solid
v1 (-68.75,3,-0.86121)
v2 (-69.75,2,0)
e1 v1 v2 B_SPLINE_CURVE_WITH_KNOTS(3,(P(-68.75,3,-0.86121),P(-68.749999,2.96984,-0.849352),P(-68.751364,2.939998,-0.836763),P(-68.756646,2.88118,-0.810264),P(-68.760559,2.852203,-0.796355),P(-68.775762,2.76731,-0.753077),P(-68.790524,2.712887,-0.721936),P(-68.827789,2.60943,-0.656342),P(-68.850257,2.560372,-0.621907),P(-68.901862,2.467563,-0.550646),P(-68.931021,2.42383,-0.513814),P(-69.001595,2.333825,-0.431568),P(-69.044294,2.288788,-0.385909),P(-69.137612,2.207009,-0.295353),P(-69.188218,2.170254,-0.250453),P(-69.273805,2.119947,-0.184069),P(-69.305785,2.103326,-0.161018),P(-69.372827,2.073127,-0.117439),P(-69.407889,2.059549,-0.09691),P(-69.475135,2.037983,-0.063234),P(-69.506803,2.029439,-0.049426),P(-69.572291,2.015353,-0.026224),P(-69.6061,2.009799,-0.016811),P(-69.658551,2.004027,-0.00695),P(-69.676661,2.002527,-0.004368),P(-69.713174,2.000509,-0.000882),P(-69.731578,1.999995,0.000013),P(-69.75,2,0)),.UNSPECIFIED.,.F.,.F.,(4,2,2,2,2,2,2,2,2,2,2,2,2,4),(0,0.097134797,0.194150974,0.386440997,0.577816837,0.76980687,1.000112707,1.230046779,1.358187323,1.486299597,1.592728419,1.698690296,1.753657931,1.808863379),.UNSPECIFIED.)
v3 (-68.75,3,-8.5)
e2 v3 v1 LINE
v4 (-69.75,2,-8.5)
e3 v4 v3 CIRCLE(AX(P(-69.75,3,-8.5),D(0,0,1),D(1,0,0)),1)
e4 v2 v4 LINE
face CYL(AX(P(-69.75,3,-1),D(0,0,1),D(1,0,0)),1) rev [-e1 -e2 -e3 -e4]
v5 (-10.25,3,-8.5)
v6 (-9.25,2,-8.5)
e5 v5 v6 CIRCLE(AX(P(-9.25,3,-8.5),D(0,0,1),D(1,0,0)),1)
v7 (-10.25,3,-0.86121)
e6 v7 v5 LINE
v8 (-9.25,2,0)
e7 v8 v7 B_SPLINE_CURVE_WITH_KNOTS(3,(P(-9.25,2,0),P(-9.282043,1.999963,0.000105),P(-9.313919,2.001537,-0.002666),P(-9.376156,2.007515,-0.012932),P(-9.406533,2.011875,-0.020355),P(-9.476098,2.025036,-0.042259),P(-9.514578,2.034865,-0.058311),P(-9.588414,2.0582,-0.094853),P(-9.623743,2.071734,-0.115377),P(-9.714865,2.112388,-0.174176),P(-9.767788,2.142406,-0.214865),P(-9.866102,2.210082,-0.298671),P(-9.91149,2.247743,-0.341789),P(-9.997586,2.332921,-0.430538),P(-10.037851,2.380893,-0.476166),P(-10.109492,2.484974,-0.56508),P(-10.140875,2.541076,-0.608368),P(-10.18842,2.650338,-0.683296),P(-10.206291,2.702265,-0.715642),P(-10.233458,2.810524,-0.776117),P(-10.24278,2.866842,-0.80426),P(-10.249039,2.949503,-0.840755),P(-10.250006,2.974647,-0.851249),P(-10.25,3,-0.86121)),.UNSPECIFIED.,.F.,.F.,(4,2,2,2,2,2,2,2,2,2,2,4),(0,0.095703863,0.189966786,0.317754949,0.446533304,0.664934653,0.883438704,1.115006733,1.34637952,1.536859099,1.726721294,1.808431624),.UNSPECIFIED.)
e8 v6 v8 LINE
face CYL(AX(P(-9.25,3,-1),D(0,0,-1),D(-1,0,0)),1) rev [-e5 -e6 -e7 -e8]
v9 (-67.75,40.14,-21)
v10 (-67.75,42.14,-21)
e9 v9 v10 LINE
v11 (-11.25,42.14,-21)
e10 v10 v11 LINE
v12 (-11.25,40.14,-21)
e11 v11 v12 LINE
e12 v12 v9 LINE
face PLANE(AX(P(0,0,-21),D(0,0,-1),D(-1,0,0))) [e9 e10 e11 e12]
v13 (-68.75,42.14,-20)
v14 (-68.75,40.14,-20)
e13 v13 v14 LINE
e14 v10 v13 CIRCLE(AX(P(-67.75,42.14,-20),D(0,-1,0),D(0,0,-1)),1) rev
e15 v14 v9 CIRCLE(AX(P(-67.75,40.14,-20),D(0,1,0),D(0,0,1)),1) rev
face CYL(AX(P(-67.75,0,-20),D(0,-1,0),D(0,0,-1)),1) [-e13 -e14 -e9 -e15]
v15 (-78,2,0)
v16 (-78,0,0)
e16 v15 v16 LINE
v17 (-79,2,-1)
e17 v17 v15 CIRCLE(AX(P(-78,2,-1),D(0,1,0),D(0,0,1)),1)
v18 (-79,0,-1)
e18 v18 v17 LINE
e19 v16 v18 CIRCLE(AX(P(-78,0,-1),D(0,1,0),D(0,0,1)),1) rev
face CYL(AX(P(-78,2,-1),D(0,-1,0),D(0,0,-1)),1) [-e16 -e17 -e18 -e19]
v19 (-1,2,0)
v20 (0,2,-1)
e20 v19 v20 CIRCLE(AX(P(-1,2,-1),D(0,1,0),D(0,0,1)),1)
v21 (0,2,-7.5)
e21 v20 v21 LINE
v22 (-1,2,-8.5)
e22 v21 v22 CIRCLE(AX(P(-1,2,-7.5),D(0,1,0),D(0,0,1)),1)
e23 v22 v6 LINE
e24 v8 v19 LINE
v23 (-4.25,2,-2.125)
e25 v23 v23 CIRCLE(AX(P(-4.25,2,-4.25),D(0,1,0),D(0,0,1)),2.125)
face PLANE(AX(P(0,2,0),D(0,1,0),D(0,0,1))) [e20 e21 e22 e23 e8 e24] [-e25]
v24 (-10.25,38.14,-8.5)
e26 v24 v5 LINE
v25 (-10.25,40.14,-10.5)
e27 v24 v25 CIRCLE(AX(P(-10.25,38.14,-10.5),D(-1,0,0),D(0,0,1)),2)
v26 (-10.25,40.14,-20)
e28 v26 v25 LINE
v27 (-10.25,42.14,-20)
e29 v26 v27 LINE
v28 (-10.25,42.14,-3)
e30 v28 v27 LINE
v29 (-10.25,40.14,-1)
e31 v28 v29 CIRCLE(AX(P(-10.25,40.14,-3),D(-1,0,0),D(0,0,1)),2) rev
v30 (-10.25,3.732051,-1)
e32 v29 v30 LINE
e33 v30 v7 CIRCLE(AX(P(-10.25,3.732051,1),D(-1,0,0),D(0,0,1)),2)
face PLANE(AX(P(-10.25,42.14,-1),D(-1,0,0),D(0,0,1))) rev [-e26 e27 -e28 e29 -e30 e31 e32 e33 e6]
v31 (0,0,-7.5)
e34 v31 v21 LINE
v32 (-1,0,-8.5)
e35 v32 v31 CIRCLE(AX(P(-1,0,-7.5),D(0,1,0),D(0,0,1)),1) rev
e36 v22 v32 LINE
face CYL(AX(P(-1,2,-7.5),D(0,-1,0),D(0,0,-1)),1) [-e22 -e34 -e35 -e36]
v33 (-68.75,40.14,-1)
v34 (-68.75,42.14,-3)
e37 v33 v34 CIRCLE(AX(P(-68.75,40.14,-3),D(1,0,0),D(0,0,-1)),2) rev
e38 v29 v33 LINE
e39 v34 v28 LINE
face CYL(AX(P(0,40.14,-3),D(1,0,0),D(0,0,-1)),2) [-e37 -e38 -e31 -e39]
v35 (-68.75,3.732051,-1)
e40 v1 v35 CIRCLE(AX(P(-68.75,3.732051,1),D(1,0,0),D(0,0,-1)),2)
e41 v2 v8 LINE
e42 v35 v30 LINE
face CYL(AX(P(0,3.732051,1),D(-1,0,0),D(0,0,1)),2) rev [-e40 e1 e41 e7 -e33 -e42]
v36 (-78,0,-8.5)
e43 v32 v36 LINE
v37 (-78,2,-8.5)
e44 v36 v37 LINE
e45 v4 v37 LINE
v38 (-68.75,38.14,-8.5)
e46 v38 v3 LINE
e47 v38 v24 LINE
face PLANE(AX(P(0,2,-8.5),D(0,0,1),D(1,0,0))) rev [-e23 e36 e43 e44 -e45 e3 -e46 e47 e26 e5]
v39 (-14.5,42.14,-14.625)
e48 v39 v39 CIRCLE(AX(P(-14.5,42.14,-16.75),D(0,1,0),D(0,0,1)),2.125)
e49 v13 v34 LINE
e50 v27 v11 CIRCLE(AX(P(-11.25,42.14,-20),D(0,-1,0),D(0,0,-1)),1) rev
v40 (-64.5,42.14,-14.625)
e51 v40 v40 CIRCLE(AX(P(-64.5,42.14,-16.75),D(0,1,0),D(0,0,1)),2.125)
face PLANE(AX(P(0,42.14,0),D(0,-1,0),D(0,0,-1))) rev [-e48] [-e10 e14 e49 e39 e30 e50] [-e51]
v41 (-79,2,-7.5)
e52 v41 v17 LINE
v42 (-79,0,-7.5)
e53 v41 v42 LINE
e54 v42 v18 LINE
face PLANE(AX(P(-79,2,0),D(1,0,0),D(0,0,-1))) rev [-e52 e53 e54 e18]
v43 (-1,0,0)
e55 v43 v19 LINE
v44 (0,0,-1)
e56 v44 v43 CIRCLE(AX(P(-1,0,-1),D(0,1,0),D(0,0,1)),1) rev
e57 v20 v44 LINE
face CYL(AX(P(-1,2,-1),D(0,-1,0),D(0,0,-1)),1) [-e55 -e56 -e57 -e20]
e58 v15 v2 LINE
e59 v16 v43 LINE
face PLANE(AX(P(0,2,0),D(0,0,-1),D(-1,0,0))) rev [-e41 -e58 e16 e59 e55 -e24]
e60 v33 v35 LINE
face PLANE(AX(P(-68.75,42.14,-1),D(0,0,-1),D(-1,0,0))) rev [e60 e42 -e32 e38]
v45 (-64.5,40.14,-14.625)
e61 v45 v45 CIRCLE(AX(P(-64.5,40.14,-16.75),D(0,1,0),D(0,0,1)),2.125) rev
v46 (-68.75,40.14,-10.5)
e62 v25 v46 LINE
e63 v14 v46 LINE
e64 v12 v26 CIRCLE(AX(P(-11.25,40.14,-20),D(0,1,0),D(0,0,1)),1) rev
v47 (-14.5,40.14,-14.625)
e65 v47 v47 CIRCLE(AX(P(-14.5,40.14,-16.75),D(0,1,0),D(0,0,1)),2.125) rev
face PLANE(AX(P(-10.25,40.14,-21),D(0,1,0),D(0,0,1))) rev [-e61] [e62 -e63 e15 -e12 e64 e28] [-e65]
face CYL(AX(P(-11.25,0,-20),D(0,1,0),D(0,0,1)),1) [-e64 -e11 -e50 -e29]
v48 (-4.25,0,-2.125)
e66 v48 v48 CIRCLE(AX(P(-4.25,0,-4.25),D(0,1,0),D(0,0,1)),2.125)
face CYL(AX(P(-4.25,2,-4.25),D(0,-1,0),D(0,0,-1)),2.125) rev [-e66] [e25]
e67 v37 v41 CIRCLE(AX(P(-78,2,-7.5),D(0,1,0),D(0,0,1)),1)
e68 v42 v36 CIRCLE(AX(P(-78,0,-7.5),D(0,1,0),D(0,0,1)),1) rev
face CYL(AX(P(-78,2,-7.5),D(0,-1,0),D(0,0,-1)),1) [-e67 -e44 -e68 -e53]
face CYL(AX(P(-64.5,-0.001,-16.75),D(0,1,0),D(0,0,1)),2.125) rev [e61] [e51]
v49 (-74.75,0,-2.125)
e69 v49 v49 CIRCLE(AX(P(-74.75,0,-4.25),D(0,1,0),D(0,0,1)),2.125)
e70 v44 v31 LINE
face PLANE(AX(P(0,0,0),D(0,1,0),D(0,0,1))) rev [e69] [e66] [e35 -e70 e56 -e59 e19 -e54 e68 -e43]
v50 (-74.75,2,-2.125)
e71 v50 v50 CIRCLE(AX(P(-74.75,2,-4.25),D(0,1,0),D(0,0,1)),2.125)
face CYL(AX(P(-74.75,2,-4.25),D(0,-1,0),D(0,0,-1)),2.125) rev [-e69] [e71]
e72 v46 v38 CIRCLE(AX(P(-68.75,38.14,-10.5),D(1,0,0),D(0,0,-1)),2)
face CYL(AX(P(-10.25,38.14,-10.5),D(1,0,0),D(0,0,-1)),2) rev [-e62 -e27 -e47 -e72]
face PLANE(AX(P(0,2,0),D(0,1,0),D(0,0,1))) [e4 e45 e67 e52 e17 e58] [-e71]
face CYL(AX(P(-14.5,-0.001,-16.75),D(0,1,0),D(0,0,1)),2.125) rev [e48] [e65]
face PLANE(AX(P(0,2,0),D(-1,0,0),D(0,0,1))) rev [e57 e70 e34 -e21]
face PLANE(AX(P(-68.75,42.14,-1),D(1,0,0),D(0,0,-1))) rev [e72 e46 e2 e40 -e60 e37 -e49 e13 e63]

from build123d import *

# Parameters (mm, degrees)
SKETCH1_W           = 79
SKETCH1_H           = 8.5
SKETCH1_R           = 2.125
BOSS_EXTRUDE1_DEPTH = 2
SKETCH3_W           = 58.5
SKETCH3_H           = 7.5
BOSS_EXTRUDE2_DEPTH = 40.14
SKETCH4_W           = 58.5
SKETCH4_H           = 2
BOSS_EXTRUDE3_DEPTH = 12.5
CUT_EXTRUDE1_REACH  = 93.966
SKETCH5_R           = 2.125
FILLET1_R           = 2
FILLET2_R           = 1
FILLET3_R           = 2
FILLET4_R           = 1
FILLET5_R           = 1


with BuildPart() as part:
    # Sketch1 → Boss-Extrude1 (new body)
    with BuildSketch(Plane(origin=(0, 0, 0), x_dir=(1, 0, 0), z_dir=(0, 1, 0))):
        with Locations((-39.5, 4.25)):
            Rectangle(SKETCH1_W, SKETCH1_H)
        with Locations(Location((-74.75, 4.25, 0), (0, 0, 270))):
            Circle(SKETCH1_R, mode=Mode.SUBTRACT)
        with Locations(Location((-4.25, 4.25, 0), (0, 0, 270))):
            Circle(SKETCH1_R, mode=Mode.SUBTRACT)
    extrude(amount=BOSS_EXTRUDE1_DEPTH)

    # Sketch3 → Boss-Extrude2 (add)
    with BuildSketch(Plane(origin=(0, 2, 0), x_dir=(1, 0, 0), z_dir=(0, 1, 0))):
        with Locations((-39.5, 4.75)):
            Rectangle(SKETCH3_W, SKETCH3_H)
    extrude(amount=BOSS_EXTRUDE2_DEPTH)

    # Sketch4 → Boss-Extrude3 (add)
    with BuildSketch(Plane(origin=(0, 0, -8.5), x_dir=(-1, 0, 0), z_dir=(0, 0, -1))):
        with Locations((39.5, 41.14)):
            Rectangle(SKETCH4_W, SKETCH4_H)
    extrude(amount=BOSS_EXTRUDE3_DEPTH)

    # Sketch5 → Cut-Extrude1 (cut, up to next)
    with BuildSketch(Plane(origin=(0, 42.14, 0), x_dir=(1, 0, 0), z_dir=(0, 1, 0)), mode=Mode.PRIVATE) as cut_extrude1_sk1:
        with Locations(Location((-14.5, 16.75, 0), (0, 0, 270))):
            Circle(SKETCH5_R)
    cut_extrude1_tool1 = extrude(cut_extrude1_sk1.sketch, amount=-CUT_EXTRUDE1_REACH, mode=Mode.PRIVATE) & part.part
    # Sketch5 → Cut-Extrude1 (cut, up to next)
    with BuildSketch(Plane(origin=(0, 42.14, 0), x_dir=(1, 0, 0), z_dir=(0, 1, 0)), mode=Mode.PRIVATE) as cut_extrude1_sk2:
        with Locations(Location((-64.5, 16.75, 0), (0, 0, 270))):
            Circle(SKETCH5_R)
    cut_extrude1_tool2 = extrude(cut_extrude1_sk2.sketch, amount=-CUT_EXTRUDE1_REACH, mode=Mode.PRIVATE) & part.part
    add(cut_extrude1_tool1.solids().sort_by_distance((-14.5, 42.14, -16.75))[0], mode=Mode.SUBTRACT)
    add(cut_extrude1_tool2.solids().sort_by_distance((-64.5, 42.14, -16.75))[0], mode=Mode.SUBTRACT)

    # Fillet1
    # the kernel refuses this fillet: 2 mm, written as the material it adds along each edge
    with BuildSketch(Plane(origin=(-68.75, 40.14, -8.5), x_dir=(0, -1, 0), z_dir=(1, 0, 0))) as fillet1_piece_1:
        with BuildLine():
            CenterArc((FILLET1_R, FILLET1_R), FILLET1_R, 180, 90)
            Line((0, FILLET1_R), (-FILLET1_R * 0.02, FILLET1_R))
            Line((-FILLET1_R * 0.02, FILLET1_R), (-FILLET1_R * 0.02, -FILLET1_R * 0.02))
            Line((-FILLET1_R * 0.02, -FILLET1_R * 0.02), (FILLET1_R, -FILLET1_R * 0.02))
            Line((FILLET1_R, -FILLET1_R * 0.02), (FILLET1_R, 0))
        make_face()
    extrude(amount=58.5)
    with BuildSketch(Plane(origin=(-68.75, 2, -1), x_dir=(0, 0, 1), z_dir=(1, 0, 0))) as fillet1_piece_2:
        with BuildLine():
            CenterArc((2, -1.732050808), FILLET1_R, 120, 60)
            Line((0, -1.732050808), (-0.04, -1.732050808))
            Line((-0.04, -1.732050808), (-0.04, 0))
            Line((-0.04, 0), (0, 0.04))
            ThreePointArc((0, 0.04), (0.5, 0.04), (0.98, 0.034641016))
            Line((0.98, 0.034641016), (1, 0))
        make_face()
    extrude(amount=58.5)

    # Fillet2
    fillet2_edges = [part.edges().sort_by_distance(p)[0] for p in [
        (-79, 1, 0),
        (-79, 1, -8.5),
        (-68.75, 41.14, -21),
        (-10.25, 41.14, -21),
        (0, 1, -8.5),
        (0, 1, 0),
    ]]
    fillet(fillet2_edges, radius=FILLET2_R)

    # Fillet3
    fillet3_edges = [part.edges().sort_by_distance(p)[0] for p in [
        (-39.5, 42.14, -1),
    ]]
    fillet(fillet3_edges, radius=FILLET3_R)

    # Fillet4
    # the kernel refuses this fillet: 1 mm, written as the material it adds along each edge
    with BuildSketch(Plane(origin=(-10.25, 2, 0), x_dir=(0, 1, 0), z_dir=(0, 0, -1))) as fillet4_piece_1_section:
        with BuildLine():
            CenterArc((FILLET4_R, FILLET4_R), FILLET4_R, 180, 90)
            Line((0, FILLET4_R), (0, 0))
            Line((0, 0), (FILLET4_R, 0))
        make_face()
    fillet4_piece_1 = extrude(amount=8.5, mode=Mode.PRIVATE)
    fillet4_piece_1 = fillet4_piece_1 - Plane(origin=(-10.019982346, 3.732050808, 1), x_dir=(0, 0, 1), z_dir=(-1, 0, 0)) * Cylinder(2, 21, mode=Mode.PRIVATE)
    add(fillet4_piece_1)

    # Fillet5
    # the kernel refuses this fillet: 1 mm, written as the material it adds along each edge
    with BuildSketch(Plane(origin=(-68.75, 2, -8.5), x_dir=(-1, 0, 0), z_dir=(0, 0, 1))) as fillet5_piece_1_section:
        with BuildLine():
            CenterArc((FILLET5_R, -FILLET5_R), FILLET5_R, 90, 90)
            Line((0, -FILLET5_R), (0, 0))
            Line((0, 0), (FILLET5_R, 0))
        make_face()
    fillet5_piece_1 = extrude(amount=8.5, mode=Mode.PRIVATE)
    fillet5_piece_1 = fillet5_piece_1 - Plane(origin=(-68.980019627, 3.732050808, 1), x_dir=(0, 0, 1), z_dir=(-1, 0, 0)) * Cylinder(2, 21, mode=Mode.PRIVATE)
    add(fillet5_piece_1)


solid = part.part
